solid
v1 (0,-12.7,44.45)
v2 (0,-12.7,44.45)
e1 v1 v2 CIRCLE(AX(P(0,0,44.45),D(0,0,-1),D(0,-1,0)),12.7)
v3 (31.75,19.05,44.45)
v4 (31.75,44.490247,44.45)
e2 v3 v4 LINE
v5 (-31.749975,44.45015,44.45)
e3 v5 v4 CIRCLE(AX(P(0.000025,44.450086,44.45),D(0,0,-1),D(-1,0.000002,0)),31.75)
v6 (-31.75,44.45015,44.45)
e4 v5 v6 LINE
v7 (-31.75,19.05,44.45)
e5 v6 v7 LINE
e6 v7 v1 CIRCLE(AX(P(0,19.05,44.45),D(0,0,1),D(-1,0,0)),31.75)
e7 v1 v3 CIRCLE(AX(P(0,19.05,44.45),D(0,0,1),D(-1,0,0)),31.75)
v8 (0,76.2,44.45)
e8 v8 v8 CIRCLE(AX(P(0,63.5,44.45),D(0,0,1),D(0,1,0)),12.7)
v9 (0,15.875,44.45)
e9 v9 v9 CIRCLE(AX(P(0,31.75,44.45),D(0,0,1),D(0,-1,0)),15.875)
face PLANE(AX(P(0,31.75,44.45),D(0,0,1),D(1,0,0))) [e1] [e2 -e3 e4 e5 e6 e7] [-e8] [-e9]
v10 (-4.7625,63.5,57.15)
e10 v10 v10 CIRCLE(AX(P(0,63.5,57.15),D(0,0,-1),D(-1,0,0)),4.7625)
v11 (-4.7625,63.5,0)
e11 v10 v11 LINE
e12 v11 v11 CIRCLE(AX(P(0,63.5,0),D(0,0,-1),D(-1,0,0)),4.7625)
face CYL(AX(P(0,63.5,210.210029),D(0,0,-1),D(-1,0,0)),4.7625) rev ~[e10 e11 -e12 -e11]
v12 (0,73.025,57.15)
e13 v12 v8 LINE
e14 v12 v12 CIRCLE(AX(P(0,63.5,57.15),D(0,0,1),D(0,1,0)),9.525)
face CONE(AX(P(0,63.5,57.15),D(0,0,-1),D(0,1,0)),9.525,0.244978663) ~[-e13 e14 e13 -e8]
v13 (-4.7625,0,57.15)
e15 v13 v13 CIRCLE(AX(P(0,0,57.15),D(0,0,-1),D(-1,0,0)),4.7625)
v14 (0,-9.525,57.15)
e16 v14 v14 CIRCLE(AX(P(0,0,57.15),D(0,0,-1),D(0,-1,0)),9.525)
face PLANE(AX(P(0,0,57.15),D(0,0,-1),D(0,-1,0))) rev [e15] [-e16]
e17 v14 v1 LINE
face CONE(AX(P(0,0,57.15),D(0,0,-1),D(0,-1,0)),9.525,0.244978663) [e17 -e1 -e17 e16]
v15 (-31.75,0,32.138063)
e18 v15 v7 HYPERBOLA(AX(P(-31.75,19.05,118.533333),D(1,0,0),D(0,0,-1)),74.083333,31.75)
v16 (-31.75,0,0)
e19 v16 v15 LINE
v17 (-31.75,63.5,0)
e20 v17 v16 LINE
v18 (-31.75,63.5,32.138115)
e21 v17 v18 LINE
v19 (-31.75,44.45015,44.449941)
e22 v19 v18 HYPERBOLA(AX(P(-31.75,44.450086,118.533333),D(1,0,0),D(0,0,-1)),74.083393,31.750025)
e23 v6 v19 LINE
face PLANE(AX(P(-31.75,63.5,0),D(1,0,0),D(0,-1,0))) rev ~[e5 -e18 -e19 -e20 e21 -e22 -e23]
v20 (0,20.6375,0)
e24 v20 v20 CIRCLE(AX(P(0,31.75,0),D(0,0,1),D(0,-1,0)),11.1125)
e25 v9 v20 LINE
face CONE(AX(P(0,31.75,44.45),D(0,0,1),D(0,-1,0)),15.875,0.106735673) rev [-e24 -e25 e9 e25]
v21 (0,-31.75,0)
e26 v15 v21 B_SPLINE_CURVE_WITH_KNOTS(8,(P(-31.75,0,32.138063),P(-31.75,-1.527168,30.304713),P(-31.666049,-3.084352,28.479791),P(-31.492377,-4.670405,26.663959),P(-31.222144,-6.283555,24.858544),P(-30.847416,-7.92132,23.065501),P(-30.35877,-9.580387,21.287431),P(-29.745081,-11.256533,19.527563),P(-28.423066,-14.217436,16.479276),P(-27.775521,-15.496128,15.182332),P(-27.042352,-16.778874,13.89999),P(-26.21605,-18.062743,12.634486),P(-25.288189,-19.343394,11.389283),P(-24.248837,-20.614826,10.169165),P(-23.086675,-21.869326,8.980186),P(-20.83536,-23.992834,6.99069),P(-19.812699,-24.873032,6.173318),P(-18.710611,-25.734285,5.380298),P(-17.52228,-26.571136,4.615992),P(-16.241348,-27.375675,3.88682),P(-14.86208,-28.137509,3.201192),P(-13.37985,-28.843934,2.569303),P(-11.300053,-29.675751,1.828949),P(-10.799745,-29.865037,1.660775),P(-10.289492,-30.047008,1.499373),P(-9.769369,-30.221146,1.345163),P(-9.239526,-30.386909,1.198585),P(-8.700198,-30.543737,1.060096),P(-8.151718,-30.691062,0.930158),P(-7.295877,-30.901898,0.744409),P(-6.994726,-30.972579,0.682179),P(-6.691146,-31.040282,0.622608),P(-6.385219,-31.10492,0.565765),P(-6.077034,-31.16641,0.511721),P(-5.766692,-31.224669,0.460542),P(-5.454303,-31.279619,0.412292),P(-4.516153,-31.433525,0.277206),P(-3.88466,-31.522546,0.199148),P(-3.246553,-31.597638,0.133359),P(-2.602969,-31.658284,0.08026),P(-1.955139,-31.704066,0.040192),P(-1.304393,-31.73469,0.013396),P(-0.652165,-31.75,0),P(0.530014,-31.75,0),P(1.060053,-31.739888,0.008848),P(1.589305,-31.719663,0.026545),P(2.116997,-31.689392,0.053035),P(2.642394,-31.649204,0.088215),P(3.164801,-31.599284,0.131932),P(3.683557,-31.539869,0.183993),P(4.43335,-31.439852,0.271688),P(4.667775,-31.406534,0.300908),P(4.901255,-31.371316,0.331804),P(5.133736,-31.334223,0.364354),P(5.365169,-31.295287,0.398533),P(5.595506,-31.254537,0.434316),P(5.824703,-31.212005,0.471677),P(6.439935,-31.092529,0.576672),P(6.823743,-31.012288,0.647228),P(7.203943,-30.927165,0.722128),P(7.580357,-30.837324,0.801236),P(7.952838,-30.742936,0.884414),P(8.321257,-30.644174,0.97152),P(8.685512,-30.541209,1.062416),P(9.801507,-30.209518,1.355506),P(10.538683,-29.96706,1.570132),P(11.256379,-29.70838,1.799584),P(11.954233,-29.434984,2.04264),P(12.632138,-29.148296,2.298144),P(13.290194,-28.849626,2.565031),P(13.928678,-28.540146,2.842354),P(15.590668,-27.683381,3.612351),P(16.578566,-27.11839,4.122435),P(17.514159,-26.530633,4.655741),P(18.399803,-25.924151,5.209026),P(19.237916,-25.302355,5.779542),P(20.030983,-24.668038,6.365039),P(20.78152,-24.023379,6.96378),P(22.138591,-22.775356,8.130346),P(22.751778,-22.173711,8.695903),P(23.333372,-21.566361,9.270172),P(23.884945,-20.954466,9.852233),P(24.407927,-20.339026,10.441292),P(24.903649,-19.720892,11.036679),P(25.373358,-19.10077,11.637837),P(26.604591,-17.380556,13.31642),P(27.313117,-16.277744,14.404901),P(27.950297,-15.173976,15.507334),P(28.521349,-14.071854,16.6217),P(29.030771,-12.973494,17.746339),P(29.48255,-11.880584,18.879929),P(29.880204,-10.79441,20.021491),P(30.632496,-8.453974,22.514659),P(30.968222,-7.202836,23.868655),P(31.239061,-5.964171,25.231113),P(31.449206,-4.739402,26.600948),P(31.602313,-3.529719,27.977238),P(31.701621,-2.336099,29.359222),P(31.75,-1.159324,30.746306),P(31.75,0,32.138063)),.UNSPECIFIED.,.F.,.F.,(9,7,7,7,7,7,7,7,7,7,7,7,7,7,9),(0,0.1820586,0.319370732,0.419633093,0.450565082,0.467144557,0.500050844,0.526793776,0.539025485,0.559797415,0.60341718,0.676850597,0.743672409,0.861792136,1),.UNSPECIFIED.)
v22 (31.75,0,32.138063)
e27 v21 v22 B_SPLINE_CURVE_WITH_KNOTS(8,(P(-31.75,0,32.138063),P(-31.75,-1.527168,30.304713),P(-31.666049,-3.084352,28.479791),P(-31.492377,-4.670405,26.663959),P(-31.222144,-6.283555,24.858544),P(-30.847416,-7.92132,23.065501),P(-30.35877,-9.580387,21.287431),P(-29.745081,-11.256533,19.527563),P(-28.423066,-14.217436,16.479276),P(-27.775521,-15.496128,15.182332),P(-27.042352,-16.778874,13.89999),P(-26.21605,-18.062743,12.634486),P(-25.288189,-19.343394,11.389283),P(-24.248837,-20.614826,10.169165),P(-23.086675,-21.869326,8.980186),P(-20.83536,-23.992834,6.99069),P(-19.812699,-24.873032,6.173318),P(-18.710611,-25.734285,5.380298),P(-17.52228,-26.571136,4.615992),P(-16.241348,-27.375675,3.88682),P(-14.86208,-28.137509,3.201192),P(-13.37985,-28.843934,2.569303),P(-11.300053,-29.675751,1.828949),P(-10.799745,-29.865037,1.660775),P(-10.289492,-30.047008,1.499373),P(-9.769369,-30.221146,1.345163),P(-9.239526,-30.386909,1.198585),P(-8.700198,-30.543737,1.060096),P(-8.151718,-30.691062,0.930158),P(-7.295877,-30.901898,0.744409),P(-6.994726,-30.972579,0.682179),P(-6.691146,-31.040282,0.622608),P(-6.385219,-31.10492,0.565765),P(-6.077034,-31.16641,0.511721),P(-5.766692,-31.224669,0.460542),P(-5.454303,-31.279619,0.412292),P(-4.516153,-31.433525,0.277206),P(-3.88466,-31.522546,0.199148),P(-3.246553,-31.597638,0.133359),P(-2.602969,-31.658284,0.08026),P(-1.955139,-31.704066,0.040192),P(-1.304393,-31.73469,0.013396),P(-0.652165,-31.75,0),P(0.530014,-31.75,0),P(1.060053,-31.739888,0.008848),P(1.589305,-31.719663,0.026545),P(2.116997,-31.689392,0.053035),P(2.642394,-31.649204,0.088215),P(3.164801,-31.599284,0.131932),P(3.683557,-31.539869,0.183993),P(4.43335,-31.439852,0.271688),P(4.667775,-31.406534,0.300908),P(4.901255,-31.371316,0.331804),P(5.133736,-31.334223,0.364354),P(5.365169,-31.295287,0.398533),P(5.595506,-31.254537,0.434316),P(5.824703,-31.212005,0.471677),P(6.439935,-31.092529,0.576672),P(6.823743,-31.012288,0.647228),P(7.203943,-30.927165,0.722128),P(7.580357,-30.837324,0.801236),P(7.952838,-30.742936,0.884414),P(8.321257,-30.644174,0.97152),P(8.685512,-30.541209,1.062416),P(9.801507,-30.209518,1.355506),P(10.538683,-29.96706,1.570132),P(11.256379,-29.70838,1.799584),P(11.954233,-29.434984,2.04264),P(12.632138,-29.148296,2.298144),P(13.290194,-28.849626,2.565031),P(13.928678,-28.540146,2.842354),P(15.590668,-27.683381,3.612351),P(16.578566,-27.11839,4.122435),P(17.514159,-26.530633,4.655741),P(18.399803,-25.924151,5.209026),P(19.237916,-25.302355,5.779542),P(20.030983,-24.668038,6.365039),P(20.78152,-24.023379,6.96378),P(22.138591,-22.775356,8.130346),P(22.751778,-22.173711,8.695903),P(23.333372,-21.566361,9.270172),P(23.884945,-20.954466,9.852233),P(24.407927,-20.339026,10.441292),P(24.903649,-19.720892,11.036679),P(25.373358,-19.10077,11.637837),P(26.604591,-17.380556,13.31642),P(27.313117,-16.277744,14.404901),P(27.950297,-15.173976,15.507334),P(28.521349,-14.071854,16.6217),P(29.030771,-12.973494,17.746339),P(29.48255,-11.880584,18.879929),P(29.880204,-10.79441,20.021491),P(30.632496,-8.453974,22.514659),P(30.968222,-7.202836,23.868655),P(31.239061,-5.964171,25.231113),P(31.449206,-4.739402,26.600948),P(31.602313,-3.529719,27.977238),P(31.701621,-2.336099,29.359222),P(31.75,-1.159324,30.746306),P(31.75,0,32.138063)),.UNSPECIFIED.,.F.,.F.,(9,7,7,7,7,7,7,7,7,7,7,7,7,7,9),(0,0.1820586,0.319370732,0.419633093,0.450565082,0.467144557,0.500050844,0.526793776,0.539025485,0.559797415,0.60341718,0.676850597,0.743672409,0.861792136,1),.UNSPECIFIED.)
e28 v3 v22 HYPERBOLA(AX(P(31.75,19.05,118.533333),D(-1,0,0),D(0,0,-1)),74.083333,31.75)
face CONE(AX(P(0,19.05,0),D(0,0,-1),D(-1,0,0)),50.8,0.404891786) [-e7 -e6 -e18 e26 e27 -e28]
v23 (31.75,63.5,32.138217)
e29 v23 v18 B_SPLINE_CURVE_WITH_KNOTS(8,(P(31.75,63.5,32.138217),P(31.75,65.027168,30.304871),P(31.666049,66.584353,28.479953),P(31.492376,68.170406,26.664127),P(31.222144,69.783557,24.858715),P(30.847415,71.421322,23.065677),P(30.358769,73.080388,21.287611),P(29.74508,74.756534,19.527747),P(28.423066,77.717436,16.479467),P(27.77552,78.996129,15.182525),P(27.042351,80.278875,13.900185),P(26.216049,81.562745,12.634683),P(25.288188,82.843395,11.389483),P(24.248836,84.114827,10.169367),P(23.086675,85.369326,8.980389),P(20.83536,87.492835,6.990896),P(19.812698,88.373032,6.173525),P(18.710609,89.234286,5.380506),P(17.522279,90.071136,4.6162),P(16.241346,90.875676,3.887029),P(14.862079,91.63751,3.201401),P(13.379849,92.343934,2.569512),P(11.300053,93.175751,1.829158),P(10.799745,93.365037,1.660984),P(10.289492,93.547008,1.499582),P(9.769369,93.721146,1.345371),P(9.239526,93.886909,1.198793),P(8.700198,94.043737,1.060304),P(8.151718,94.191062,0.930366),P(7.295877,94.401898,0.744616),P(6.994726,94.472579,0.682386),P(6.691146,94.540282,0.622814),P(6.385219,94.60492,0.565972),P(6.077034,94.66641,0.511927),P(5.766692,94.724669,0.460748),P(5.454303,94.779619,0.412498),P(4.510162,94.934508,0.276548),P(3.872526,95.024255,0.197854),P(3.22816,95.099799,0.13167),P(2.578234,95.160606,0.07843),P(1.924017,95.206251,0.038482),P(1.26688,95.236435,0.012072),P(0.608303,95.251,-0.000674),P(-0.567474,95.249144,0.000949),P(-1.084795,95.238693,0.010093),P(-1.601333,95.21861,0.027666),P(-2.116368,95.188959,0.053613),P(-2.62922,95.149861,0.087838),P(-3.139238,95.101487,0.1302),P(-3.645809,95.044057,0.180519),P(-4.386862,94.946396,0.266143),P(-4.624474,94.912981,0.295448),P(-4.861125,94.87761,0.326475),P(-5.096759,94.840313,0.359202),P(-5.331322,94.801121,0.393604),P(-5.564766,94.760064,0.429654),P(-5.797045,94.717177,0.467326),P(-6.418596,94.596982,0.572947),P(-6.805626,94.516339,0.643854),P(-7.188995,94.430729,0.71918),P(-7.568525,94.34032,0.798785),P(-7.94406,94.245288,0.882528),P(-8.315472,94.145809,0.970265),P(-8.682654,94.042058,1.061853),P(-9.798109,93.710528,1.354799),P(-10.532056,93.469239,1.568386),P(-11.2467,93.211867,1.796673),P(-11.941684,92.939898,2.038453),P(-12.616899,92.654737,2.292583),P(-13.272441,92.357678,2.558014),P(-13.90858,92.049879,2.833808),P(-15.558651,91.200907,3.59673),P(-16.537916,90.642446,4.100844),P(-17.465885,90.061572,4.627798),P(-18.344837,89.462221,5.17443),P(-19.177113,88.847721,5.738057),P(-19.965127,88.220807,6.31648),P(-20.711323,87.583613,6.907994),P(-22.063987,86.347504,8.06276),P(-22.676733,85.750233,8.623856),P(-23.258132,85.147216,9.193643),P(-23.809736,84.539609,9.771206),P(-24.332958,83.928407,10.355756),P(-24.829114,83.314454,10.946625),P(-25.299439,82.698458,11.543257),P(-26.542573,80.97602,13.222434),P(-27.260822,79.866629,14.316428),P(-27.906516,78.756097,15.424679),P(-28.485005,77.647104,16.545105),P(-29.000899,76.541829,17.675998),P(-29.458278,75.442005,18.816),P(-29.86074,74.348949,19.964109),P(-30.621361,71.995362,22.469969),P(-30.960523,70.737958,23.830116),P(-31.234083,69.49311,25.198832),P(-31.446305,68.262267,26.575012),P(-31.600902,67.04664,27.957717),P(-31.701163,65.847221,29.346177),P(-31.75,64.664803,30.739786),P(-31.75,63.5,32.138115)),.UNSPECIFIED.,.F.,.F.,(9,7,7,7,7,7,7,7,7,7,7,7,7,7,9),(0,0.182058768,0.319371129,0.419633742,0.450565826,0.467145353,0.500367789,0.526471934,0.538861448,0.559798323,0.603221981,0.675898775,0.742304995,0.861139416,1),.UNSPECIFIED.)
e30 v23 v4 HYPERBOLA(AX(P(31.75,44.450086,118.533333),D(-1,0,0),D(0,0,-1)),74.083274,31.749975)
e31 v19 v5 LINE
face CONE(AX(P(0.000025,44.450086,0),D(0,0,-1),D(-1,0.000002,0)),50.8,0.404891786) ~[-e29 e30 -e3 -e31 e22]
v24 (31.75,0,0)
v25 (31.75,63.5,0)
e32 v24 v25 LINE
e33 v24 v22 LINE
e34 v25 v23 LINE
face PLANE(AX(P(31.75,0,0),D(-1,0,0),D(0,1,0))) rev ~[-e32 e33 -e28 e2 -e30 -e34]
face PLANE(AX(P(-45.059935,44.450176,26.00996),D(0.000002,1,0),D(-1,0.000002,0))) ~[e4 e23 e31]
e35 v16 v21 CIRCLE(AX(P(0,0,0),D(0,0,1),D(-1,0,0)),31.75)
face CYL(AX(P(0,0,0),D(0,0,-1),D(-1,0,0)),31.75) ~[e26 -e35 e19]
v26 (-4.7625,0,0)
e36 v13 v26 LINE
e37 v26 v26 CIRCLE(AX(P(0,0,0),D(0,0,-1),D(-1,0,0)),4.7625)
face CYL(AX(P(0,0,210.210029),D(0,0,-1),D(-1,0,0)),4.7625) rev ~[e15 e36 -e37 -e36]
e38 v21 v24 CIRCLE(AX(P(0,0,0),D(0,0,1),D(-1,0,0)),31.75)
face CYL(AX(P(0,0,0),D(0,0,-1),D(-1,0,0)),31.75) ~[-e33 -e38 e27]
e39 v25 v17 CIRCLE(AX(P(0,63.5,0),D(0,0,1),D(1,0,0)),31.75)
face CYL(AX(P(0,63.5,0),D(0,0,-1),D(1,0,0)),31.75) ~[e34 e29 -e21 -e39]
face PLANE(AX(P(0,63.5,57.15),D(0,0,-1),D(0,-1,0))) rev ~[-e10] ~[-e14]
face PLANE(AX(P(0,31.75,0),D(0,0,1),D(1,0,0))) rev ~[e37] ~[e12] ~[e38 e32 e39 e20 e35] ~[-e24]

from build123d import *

# Parameters (mm, degrees)
F1_DEPTH      = 44.45
F4_ANGLE_BACK = 90
F4_ANGLE      = 180
F10_D         = 9.525


# Not quite as in the source:
# - a pattern or mirror of a feature is missing from the dataset's text; its kind, count and spacing are read off the source's solid


with BuildPart() as f1:
    # F0 (on Top) → F1 (new body)
    with BuildSketch(Plane.XY):
        with BuildLine():
            Line((-31.75, 63.5), (-31.75, 0))
            ThreePointArc((-31.75, 0), (0, -31.75), (31.75, 0))
            Line((31.75, 0), (31.75, 63.5))
            ThreePointArc((31.75, 63.5), (0, 95.25), (-31.75, 63.5))
        make_face()
    extrude(amount=F1_DEPTH)

    # F3 (on Right) → F4 (revolve, cut)
    with BuildSketch(Plane.YZ, mode=Mode.PRIVATE) as f4_sk:
        Polygon((-31.75, 0), (-12.7, 44.45), (-31.75, 44.45), align=None)
    f4 = revolve(f4_sk.sketch.rotate(Axis((0, 19.05, 31.5998233855), (0, 0, 1)), -F4_ANGLE_BACK), axis=Axis((0, 19.05, 31.5998233855), (0, 0, 1)), revolution_arc=F4_ANGLE, mode=Mode.SUBTRACT)

    # F4_copies: F4 across plane
    add(f4.mirror(Plane(origin=(4e-05, 31.750043, -6e-06), x_dir=(1, -1e-06, 0), z_dir=(1e-06, 1, 0))), mode=Mode.SUBTRACT)

    # F5 (on Right) → F6 (revolve)
    with BuildSketch(Plane.YZ):
        Polygon((-9.525, 57.15), (-12.7, 44.45), (0, 44.45), (0, 57.15), align=None)
    f6 = revolve(axis=Axis((0, 0, 50.8), (0, 0, -1)))

    # F6_copies: F6 across plane
    add(f6.mirror(Plane.ZX.offset(31.75)))

    # F7 (on Right) → F8 (revolve, cut)
    with BuildSketch(Plane.YZ):
        Polygon((20.6375, 0), (31.75, 0), (31.75, 44.45), (15.875, 44.45), align=None)
    revolve(axis=Axis((0, 31.75, 22.225), (0, 0, 1)), mode=Mode.SUBTRACT)

    # F10 (through all)
    with Locations(Plane.XY.offset(57.15)):
        with Locations((0, 0), (0, 63.5)):
            Hole(F10_D / 2)


solid = f1.part
